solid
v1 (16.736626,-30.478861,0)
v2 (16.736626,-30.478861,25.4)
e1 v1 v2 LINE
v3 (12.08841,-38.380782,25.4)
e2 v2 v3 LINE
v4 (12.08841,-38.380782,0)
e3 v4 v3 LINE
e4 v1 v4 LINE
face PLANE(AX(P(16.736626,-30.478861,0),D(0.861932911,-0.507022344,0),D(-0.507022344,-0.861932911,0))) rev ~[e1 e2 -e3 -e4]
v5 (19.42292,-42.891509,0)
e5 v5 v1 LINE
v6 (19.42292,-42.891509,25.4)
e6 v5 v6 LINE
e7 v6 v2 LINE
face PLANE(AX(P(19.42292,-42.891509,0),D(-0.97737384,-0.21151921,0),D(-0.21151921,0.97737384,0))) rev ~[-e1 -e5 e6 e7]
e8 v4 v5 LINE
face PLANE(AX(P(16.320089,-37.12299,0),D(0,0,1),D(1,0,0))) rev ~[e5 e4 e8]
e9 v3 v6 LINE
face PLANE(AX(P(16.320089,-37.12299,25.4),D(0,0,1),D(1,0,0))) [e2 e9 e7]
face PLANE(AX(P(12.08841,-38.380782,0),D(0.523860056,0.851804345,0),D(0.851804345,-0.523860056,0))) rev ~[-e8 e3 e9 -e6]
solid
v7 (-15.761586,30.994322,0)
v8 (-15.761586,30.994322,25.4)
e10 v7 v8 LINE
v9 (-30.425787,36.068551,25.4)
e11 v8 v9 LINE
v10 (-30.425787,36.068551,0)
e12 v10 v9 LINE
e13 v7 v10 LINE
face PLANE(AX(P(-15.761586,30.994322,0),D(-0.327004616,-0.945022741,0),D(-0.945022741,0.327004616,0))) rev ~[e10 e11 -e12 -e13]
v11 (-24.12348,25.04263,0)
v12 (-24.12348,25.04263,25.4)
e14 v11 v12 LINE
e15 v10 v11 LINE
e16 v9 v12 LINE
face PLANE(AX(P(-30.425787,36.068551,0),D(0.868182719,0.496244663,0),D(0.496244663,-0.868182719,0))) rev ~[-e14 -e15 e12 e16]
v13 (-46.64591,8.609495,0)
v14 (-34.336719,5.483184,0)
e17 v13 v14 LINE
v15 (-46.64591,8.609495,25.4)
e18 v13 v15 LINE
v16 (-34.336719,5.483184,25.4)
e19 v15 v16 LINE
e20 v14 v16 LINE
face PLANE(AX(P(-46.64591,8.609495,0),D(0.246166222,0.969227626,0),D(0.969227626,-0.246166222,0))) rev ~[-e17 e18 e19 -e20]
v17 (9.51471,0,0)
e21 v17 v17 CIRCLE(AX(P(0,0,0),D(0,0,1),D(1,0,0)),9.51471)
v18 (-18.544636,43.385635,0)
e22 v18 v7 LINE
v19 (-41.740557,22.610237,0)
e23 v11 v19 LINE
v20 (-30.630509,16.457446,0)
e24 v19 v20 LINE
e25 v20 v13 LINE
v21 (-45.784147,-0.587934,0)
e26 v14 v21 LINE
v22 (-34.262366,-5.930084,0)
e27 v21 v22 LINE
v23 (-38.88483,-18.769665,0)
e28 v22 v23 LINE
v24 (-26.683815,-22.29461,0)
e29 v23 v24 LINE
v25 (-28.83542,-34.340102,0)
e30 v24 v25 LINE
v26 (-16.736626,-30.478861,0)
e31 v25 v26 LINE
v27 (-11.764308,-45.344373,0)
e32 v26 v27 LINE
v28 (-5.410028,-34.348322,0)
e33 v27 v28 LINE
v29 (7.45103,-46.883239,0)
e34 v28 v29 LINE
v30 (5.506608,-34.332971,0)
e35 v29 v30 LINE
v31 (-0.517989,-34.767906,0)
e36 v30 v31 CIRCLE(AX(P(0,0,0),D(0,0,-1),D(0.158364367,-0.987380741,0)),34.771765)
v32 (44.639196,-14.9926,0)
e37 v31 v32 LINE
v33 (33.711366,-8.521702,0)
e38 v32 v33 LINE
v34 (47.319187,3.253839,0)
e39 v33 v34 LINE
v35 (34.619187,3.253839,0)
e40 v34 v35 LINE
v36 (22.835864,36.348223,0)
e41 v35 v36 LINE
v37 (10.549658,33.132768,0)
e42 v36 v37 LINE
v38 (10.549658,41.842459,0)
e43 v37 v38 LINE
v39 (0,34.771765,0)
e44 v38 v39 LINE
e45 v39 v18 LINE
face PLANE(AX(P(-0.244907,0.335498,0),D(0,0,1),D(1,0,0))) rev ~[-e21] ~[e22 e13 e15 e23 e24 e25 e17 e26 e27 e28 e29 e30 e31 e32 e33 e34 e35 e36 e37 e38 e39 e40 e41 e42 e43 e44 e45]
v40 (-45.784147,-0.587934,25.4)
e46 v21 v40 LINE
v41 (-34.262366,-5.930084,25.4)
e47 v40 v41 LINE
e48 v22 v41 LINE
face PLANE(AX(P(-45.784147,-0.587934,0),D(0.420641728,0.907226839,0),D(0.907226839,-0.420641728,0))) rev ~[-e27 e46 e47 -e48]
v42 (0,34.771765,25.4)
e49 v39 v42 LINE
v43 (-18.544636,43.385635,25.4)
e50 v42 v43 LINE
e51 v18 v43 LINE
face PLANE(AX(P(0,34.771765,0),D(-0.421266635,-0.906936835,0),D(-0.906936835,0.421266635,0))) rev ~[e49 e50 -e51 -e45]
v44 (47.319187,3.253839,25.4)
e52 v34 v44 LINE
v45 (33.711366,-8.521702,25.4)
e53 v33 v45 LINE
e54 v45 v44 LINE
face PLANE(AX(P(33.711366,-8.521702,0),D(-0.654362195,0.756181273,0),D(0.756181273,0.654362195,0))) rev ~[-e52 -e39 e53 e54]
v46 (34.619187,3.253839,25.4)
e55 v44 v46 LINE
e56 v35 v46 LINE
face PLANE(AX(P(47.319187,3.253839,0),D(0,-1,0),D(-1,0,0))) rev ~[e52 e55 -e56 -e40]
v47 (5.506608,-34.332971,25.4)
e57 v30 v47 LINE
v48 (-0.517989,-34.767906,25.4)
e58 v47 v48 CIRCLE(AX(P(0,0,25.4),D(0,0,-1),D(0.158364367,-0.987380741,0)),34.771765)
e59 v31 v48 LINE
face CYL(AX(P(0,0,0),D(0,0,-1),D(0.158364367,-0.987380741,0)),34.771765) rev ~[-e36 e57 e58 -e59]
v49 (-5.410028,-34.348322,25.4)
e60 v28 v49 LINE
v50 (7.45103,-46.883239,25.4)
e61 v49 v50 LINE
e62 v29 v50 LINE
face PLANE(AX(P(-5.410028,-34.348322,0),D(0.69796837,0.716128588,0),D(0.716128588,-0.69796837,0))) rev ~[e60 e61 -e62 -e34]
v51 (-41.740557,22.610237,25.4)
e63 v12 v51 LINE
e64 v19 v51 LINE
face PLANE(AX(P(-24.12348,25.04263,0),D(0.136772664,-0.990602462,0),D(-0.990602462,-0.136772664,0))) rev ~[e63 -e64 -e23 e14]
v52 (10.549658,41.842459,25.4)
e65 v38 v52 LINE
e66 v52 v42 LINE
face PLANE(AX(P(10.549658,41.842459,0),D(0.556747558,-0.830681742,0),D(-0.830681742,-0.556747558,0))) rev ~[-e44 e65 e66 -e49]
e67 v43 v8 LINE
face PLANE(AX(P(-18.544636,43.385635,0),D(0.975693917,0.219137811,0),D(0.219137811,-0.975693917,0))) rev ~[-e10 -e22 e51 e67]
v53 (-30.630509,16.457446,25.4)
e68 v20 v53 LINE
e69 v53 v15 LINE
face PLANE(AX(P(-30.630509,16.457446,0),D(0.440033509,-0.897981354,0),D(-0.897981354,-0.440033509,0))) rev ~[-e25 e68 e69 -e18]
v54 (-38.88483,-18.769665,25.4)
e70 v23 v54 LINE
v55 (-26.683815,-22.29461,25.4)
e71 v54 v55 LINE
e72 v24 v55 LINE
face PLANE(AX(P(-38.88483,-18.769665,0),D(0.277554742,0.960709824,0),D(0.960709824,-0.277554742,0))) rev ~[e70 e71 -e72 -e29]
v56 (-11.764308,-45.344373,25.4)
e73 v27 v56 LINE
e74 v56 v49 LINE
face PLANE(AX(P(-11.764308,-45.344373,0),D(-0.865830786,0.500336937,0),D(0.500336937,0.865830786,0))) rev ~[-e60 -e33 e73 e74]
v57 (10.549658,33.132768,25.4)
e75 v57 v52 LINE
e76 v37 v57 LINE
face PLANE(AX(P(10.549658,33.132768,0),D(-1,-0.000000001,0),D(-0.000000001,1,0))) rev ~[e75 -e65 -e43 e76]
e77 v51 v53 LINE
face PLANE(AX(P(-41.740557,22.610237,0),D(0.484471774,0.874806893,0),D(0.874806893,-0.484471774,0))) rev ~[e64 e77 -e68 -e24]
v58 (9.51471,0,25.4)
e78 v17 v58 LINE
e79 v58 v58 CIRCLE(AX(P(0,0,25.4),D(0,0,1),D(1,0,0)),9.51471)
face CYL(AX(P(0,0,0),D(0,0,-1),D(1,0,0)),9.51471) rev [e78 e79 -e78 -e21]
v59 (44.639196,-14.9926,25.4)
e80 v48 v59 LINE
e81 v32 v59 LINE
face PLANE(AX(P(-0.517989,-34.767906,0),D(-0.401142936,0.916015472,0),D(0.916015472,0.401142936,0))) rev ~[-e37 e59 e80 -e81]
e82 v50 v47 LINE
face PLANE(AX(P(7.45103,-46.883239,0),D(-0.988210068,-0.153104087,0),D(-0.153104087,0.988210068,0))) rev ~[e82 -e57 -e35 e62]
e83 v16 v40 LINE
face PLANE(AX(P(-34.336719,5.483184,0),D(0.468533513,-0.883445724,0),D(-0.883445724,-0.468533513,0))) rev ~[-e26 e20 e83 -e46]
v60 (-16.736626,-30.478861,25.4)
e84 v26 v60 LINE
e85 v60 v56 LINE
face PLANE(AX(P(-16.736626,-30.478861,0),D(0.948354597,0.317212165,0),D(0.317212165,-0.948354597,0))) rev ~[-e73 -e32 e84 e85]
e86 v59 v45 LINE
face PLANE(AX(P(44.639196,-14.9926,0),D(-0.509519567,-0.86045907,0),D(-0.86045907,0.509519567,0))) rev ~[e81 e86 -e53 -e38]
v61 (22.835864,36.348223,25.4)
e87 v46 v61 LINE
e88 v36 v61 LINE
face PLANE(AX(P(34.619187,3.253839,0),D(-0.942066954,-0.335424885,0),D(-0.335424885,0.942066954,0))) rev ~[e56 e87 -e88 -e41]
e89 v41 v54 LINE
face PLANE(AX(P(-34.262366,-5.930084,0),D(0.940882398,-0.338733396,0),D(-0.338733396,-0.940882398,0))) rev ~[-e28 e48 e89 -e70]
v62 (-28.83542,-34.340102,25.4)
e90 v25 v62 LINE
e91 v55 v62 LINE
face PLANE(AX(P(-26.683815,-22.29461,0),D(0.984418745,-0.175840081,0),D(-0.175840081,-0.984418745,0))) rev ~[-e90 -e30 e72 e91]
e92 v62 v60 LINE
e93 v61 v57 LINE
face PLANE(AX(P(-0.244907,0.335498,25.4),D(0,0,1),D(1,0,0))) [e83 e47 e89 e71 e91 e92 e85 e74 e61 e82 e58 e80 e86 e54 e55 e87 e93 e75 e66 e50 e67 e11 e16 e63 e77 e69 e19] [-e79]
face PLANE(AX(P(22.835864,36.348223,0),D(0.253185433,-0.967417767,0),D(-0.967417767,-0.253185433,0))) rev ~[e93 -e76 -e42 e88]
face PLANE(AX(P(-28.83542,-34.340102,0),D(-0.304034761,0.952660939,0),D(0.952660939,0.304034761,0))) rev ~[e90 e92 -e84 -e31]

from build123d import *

# Parameters (mm, degrees)
F0_R     = 9.5147098481
F1_DEPTH = 25.4


with BuildPart() as f1:
    # F0 (on Top) → F1 (new body)
    with BuildSketch(Plane.XY):
        with BuildLine():
            ThreePointArc((33.7113661444, -8.521701965), (34.5056466306, -4.2937119493), (34.7717645756, 0))
            ThreePointArc((34.7717645756, 0), (34.7335993542, 1.6287073412), (34.6191874697, 3.253839369))
            Line((34.6191874697, 3.253839369), (28.8855670333, 19.357159628))
            ThreePointArc((28.8855670333, 19.357159628), (20.8860262727, 27.8001711908), (10.5496581318, 33.1327681458))
            ThreePointArc((10.5496581318, 33.1327681458), (5.3381081878, 34.3595723588), (4.9e-09, 34.7717645756))
            ThreePointArc((4.9e-09, 34.7717645756), (-8.1039598603, 33.8142195871), (-15.7615859684, 30.9943223746))
            ThreePointArc((-15.7615859684, 30.9943223746), (-20.1633398845, 28.3287016364), (-24.123479709, 25.0426304216))
            ThreePointArc((-24.123479709, 25.0426304216), (-27.7114808583, 21.003557802), (-30.630509106, 16.457445841))
            ThreePointArc((-30.630509106, 16.457445841), (-32.9437975869, 11.1257274932), (-34.3367194248, 5.4831843706))
            ThreePointArc((-34.3367194248, 5.4831843706), (-34.7710267297, -0.2265212223), (-34.2623659277, -5.930083704))
            ThreePointArc((-34.2623659277, -5.930083704), (-31.5524748858, -14.6122188692), (-26.6838149969, -22.2946098623))
            ThreePointArc((-26.6838149969, -22.2946098623), (-22.0925138505, -26.851376938), (-16.7366261479, -30.47886082))
            ThreePointArc((-16.7366261479, -30.47886082), (-11.2410746557, -32.9046174919), (-5.4100284558, -34.348321703))
            ThreePointArc((-5.4100284558, -34.348321703), (-2.9714241062, -34.6445702886), (-0.5179892362, -34.7679061615))
            Line((-0.5179892362, -34.7679061615), (25.9024363536, -23.1978318524))
            ThreePointArc((25.9024363536, -23.1978318524), (30.6968819131, -16.3333111315), (33.7113661444, -8.521701965))
        make_face()
        Circle(F0_R, mode=Mode.SUBTRACT)
        with BuildLine():
            Line((-45.7841467777, -0.5879337581), (-34.2623659277, -5.930083704))
            ThreePointArc((-34.2623659277, -5.930083704), (-34.7710267297, -0.2265212223), (-34.3367194248, 5.4831843706))
            Line((-34.3367194248, 5.4831843706), (-45.7841467777, -0.5879337581))
        make_face()
        with BuildLine():
            Line((-38.8848297568, -18.7696646387), (-26.6838149969, -22.2946098623))
            ThreePointArc((-26.6838149969, -22.2946098623), (-31.5524748858, -14.6122188692), (-34.2623659277, -5.930083704))
            Line((-34.2623659277, -5.930083704), (-38.8848297568, -18.7696646387))
        make_face()
        with BuildLine():
            Line((-28.8354200673, -34.3401022908), (-16.7366261479, -30.47886082))
            ThreePointArc((-16.7366261479, -30.47886082), (-22.0925138505, -26.851376938), (-26.6838149969, -22.2946098623))
            Line((-26.6838149969, -22.2946098623), (-28.8354200673, -34.3401022908))
        make_face()
        with BuildLine():
            Line((-11.7643075513, -45.344372684), (-5.4100284558, -34.348321703))
            ThreePointArc((-5.4100284558, -34.348321703), (-11.2410746557, -32.9046174919), (-16.7366261479, -30.47886082))
            Line((-16.7366261479, -30.47886082), (-11.7643075513, -45.344372684))
        make_face()
        with BuildLine():
            ThreePointArc((5.5066084769, -34.3329706665), (2.5037716955, -34.6815042782), (-0.5179892362, -34.7679061615))
            Line((-0.5179892362, -34.7679061615), (6.1559116798, -38.5238970706))
            Line((6.1559116798, -38.5238970706), (5.5066084769, -34.3329706665))
        make_face()
        with BuildLine():
            Line((6.1559116798, -38.5238970706), (-0.5179892362, -34.7679061615))
            ThreePointArc((-0.5179892362, -34.7679061615), (-2.9714241062, -34.6445702886), (-5.4100284558, -34.348321703))
            Line((-5.4100284558, -34.348321703), (7.4510303863, -46.8832385297))
            Line((7.4510303863, -46.8832385297), (6.1559116798, -38.5238970706))
        make_face()
        with BuildLine():
            Line((44.63919633, -14.992600468), (33.7113661444, -8.521701965))
            ThreePointArc((33.7113661444, -8.521701965), (30.6968819131, -16.3333111315), (25.9024363536, -23.1978318524))
            Line((25.9024363536, -23.1978318524), (44.63919633, -14.992600468))
        make_face()
        with BuildLine():
            ThreePointArc((34.6191874697, 3.253839369), (34.7335993542, 1.6287073412), (34.7717645756, 0))
            ThreePointArc((34.7717645756, 0), (34.5056466306, -4.2937119493), (33.7113661444, -8.521701965))
            Line((33.7113661444, -8.521701965), (47.3191874697, 3.253839369))
            Line((47.3191874697, 3.253839369), (34.6191874697, 3.253839369))
        make_face()
        with BuildLine():
            ThreePointArc((10.5496581318, 33.1327681458), (20.8860262727, 27.8001711908), (28.8855670333, 19.357159628))
            Line((28.8855670333, 19.357159628), (22.8358637772, 36.3482231429))
            Line((22.8358637772, 36.3482231429), (10.5496581318, 33.1327681458))
        make_face()
        with BuildLine():
            ThreePointArc((4.9e-09, 34.7717645756), (5.3381081878, 34.3595723588), (10.5496581318, 33.1327681458))
            Line((10.5496581318, 33.1327681458), (10.5496581218, 41.8424585666))
            Line((10.5496581218, 41.8424585666), (0, 34.7717645756))
        make_face()
        with BuildLine():
            ThreePointArc((-15.7615859684, 30.9943223746), (-8.1039598603, 33.8142195871), (4.9e-09, 34.7717645756))
            Line((0, 34.7717645756), (-18.5446361736, 43.3856351201))
            Line((-18.5446361736, 43.3856351201), (-15.7615859684, 30.9943223746))
        make_face()
        with BuildLine():
            ThreePointArc((-24.123479709, 25.0426304216), (-20.1633398845, 28.3287016364), (-15.7615859684, 30.9943223746))
            Line((-15.7615859684, 30.9943223746), (-30.4257869342, 36.0685509564))
            Line((-30.4257869342, 36.0685509564), (-24.123479709, 25.0426304216))
        make_face()
        with BuildLine():
            ThreePointArc((-30.630509106, 16.457445841), (-27.7114808583, 21.003557802), (-24.123479709, 25.0426304216))
            Line((-24.123479709, 25.0426304216), (-41.7405566495, 22.6102373684))
            Line((-41.7405566495, 22.6102373684), (-30.630509106, 16.457445841))
        make_face()
        with BuildLine():
            ThreePointArc((-34.3367194248, 5.4831843706), (-32.9437975869, 11.1257274932), (-30.630509106, 16.457445841))
            Line((-30.630509106, 16.457445841), (-46.6459102761, 8.6094953897))
            Line((-46.6459102761, 8.6094953897), (-34.3367194248, 5.4831843706))
        make_face()
    extrude(amount=F1_DEPTH)


with BuildPart() as f1b:
    # F0 (on Top) → F1, piece 2 (new body)
    with BuildSketch(Plane.XY):
        Polygon((19.4229201156, -42.8915085923), (16.7366261479, -30.47886082), (12.0884100824, -38.3807816184), align=None)
    extrude(amount=F1_DEPTH)


solid = Compound([f1.part, f1b.part])
